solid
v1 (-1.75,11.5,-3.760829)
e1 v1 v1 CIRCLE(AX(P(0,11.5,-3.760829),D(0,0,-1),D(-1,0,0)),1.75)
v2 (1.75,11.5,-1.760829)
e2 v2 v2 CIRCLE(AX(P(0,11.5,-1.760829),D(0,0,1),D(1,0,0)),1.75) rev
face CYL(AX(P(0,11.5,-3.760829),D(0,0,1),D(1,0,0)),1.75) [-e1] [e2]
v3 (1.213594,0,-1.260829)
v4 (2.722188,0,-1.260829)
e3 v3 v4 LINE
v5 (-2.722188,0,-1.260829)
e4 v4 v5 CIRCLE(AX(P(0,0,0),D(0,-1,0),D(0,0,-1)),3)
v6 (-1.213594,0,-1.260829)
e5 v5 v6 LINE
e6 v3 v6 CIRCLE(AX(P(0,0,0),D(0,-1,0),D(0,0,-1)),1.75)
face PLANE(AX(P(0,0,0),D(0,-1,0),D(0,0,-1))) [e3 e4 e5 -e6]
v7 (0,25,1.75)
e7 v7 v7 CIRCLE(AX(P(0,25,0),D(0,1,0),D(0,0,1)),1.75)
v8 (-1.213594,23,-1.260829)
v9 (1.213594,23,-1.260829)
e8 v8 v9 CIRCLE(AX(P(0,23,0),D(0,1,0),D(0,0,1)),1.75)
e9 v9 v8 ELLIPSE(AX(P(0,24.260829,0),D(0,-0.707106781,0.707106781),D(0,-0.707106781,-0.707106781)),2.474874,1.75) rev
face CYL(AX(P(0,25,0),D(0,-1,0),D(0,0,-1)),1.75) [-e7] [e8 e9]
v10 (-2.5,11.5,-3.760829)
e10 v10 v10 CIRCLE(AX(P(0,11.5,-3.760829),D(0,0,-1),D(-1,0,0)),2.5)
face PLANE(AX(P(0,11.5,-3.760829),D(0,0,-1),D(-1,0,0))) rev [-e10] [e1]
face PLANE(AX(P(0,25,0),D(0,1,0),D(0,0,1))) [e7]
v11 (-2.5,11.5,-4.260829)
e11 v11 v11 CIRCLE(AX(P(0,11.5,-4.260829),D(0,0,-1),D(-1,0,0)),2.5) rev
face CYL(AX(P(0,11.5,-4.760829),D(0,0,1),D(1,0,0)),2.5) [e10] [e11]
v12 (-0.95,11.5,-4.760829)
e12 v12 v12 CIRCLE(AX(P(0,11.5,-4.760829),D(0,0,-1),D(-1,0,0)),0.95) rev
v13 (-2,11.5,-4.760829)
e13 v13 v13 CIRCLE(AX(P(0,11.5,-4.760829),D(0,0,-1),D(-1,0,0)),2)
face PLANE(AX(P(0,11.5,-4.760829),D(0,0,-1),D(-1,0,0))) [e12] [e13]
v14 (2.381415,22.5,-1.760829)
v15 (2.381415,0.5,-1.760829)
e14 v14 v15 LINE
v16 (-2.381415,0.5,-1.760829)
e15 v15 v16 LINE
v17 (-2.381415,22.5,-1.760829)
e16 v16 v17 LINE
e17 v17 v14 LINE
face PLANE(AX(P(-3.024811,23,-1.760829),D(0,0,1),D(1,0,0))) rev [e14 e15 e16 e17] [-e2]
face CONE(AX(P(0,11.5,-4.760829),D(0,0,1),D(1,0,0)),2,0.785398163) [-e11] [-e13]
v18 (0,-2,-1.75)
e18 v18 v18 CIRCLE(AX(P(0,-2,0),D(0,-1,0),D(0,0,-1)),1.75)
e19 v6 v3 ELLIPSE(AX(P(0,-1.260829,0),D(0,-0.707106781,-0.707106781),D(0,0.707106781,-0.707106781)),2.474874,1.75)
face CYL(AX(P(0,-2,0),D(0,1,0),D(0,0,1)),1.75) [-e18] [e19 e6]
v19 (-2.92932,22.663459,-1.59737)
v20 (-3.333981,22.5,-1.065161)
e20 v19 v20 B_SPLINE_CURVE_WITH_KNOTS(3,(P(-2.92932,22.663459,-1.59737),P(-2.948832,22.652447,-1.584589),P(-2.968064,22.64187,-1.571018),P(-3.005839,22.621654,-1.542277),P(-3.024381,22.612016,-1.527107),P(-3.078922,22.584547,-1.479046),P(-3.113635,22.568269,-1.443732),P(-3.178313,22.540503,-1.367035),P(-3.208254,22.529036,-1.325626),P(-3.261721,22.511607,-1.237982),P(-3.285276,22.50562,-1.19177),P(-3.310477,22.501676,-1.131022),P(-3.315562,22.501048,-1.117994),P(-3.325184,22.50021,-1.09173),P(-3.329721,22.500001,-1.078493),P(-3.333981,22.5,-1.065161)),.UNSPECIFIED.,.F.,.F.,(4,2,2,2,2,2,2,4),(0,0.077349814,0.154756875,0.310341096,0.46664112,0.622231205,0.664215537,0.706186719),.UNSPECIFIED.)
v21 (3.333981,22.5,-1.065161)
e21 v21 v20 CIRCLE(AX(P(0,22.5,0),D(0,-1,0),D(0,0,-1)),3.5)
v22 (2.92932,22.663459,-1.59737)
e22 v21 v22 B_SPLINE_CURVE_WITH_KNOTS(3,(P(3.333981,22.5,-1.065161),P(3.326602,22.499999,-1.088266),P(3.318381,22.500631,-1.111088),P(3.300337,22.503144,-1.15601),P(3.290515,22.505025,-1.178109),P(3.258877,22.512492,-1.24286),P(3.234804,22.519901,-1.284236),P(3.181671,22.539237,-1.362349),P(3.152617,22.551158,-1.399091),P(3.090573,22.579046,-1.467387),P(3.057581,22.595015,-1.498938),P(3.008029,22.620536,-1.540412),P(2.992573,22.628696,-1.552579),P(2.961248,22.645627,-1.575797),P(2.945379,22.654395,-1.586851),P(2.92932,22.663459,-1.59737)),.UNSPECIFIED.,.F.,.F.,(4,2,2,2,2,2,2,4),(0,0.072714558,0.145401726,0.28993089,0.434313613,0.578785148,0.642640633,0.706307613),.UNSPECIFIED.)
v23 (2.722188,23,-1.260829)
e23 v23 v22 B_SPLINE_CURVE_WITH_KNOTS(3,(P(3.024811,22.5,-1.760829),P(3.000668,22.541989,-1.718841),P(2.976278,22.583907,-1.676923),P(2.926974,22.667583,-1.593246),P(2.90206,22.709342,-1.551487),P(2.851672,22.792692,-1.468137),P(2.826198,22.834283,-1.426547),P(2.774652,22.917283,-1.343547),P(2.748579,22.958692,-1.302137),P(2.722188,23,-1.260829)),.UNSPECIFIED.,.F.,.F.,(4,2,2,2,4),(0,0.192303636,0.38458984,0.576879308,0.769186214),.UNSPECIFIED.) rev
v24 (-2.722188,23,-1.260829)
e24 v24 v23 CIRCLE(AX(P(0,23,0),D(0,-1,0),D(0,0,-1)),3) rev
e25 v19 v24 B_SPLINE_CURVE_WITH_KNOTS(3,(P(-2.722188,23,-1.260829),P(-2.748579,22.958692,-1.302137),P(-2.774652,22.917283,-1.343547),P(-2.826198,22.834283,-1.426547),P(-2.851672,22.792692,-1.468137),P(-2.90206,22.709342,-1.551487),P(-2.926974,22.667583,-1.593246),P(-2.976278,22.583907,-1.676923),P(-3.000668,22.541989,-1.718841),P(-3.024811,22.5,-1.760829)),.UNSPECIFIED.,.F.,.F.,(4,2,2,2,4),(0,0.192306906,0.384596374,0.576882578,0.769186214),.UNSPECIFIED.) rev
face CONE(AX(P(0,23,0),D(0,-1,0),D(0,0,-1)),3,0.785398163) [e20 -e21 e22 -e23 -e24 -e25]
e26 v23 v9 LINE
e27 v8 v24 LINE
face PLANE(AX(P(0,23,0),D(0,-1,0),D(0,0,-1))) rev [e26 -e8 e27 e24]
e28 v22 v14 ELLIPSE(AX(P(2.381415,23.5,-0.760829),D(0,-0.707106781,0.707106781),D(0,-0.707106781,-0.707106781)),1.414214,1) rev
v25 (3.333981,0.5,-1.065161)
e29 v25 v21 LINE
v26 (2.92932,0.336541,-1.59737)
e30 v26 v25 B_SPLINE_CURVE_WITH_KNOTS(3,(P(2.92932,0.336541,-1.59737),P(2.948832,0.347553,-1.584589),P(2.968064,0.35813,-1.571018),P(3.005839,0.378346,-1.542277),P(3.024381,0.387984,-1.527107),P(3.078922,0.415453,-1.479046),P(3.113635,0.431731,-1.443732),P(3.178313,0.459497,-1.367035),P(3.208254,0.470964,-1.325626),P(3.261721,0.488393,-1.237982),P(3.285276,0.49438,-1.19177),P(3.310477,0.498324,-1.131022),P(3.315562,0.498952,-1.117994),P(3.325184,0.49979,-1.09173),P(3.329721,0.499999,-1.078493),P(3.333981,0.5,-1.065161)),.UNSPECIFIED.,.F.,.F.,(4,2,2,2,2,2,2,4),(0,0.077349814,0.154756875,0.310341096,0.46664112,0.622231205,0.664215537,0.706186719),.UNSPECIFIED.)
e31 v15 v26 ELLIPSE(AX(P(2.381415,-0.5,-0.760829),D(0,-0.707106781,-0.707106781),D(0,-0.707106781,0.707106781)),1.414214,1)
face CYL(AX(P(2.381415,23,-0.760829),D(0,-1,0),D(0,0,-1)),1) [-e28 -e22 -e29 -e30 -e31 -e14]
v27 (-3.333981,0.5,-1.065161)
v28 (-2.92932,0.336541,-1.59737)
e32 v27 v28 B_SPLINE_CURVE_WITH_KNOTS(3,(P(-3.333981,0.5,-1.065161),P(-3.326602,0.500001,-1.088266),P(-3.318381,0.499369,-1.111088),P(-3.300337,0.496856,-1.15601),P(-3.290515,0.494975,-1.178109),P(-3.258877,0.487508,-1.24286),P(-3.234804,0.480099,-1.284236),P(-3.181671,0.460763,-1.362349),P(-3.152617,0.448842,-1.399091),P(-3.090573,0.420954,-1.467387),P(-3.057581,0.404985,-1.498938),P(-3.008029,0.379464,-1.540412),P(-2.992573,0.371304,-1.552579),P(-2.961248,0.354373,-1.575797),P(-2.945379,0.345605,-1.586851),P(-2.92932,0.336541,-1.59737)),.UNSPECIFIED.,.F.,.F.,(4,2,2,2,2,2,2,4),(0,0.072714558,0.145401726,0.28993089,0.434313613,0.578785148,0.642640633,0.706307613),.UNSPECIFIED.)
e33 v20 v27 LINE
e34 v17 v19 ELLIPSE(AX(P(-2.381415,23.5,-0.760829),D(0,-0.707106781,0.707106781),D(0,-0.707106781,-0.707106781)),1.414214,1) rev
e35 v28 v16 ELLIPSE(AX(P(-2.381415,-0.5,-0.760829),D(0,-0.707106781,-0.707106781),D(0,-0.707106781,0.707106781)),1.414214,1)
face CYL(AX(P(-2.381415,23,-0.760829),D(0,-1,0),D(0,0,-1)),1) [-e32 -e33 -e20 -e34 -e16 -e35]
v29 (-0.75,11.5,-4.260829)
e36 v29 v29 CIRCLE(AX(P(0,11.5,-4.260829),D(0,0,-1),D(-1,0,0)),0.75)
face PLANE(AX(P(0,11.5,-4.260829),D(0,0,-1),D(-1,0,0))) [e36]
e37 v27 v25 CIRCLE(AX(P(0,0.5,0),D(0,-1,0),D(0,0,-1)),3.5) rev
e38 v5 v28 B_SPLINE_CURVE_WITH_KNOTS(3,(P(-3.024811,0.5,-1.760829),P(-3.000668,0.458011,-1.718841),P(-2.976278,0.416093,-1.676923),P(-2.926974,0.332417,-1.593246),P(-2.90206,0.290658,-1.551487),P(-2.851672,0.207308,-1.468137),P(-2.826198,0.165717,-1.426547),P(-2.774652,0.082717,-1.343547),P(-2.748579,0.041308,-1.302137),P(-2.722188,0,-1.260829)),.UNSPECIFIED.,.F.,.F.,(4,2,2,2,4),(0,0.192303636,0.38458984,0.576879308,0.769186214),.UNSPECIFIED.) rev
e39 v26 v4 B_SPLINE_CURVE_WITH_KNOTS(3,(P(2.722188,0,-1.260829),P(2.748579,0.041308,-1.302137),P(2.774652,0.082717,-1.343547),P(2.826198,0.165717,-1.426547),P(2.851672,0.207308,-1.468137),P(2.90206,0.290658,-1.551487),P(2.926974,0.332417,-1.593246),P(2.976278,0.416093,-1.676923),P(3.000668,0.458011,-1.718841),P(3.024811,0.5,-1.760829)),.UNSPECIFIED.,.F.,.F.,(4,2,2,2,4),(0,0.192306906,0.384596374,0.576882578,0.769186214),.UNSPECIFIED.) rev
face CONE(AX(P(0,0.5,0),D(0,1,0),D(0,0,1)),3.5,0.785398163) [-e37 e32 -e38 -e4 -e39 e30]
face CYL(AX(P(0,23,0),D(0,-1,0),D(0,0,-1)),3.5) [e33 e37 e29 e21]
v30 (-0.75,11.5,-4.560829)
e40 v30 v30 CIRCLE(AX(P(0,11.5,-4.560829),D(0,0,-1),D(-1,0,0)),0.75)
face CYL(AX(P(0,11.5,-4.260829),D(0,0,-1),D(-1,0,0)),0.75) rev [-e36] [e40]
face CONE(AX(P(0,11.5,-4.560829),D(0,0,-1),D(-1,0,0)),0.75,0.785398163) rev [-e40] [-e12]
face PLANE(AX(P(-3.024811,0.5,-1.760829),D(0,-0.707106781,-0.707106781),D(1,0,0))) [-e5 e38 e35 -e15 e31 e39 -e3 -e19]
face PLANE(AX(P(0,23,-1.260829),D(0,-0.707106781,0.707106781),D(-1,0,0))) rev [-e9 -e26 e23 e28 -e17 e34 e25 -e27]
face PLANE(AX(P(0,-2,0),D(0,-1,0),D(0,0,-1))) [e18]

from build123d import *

# Parameters (mm, degrees)
EXTRUDE_1_DEPTH     = 23
SKETCH_2_R          = 1.75
EXTRUDE_2_DEPTH     = 2
EXTRUDE_START       = 2
SKETCH_3_R          = 1.75
EXTRUDE_3_DEPTH     = 2
SKETCH_4_R          = 1.75
EXTRUDE_4_DEPTH     = 2
SKETCH_5_R          = 2.5
EXTRUDE_5_DEPTH     = 1
CHAMFER_1_SIZE      = 0.5
SKETCH_6_R          = 0.75
CUT_EXTRUDE_1_DEPTH = 0.5
CHAMFER_2_SIZE      = 0.2
CHAMFER_3_SIZE      = 0.5
FILLET_3_R          = 1


with BuildPart() as part:
    # 草图1 → 凸台-拉伸1 (new body)
    with BuildSketch(Plane(origin=(0, 0, 0), x_dir=(1, 0, 0), z_dir=(0, 1, 0))):
        with BuildLine():
            Line((-3.024810761, 1.76082931), (3.024810761, 1.76082931))
            ThreePointArc((3.024810761, 1.76082931), (0, -3.5), (-3.024810761, 1.76082931))
        make_face()
    extrude(amount=EXTRUDE_1_DEPTH)

    # 草图2 → 凸台-拉伸2 (add)
    with BuildSketch(Plane(origin=(0, 23, 0), x_dir=(1, 0, 0), z_dir=(0, 1, 0))):
        with Locations(Location((0, 0, 0), (0, 0, 270))):
            Circle(SKETCH_2_R)
    extrude(amount=EXTRUDE_2_DEPTH)

    # 草图3 → 凸台-拉伸3 (add)
    with BuildSketch(Plane.XZ.offset(EXTRUDE_START)):
        with Locations(Location((0, 0, 0), (0, 0, 90))):
            Circle(SKETCH_3_R)
    extrude(amount=-EXTRUDE_3_DEPTH)

    # 草图4 → 凸台-拉伸4 (add)
    with BuildSketch(Plane(origin=(0, 0, -1.76082931), x_dir=(-1, 0, 0), z_dir=(0, 0, -1))):
        with Locations(Location((0, 11.5, 0), (0, 0, 180))):
            Circle(SKETCH_4_R)
    extrude(amount=EXTRUDE_4_DEPTH)

    # 草图5 → 凸台-拉伸5 (add)
    with BuildSketch(Plane(origin=(0, 0, -3.76082931), x_dir=(-1, 0, 0), z_dir=(0, 0, -1))):
        with Locations((0, 11.5)):
            Circle(SKETCH_5_R)
    extrude(amount=EXTRUDE_5_DEPTH)

    # 倒角1
    chamfer_1_edges = [part.edges().sort_by_distance(p)[0] for p in [
        (2.5, 11.5, -4.76082931),
    ]]
    chamfer(chamfer_1_edges, length=CHAMFER_1_SIZE)

    # 草图6 → 切除-拉伸1 (cut)
    with BuildSketch(Plane(origin=(0, 0, -4.76082931), x_dir=(-1, 0, 0), z_dir=(0, 0, -1))):
        with Locations((0, 11.5)):
            Circle(SKETCH_6_R)
    extrude(amount=-CUT_EXTRUDE_1_DEPTH, mode=Mode.SUBTRACT)

    # 倒角2
    chamfer_2_edges = [part.edges().sort_by_distance(p)[0] for p in [
        (0.75, 11.5, -4.76082931),
    ]]
    chamfer(chamfer_2_edges, length=CHAMFER_2_SIZE)

    # 倒角3
    # the kernel refuses this chamfer: 0.5 mm, written as the material it takes off along each edge
    with BuildSketch(Plane(origin=(-4.310652255, 0, -1.76082931), x_dir=(0, 0.9996219169112968, -0.027495876610586494), z_dir=(1, 0, 0))) as chamfer_3_piece_1_section:
        Polygon((CHAMFER_3_SIZE * 0.999621916911, CHAMFER_3_SIZE * 0.0274958766106), (-CHAMFER_3_SIZE * 0.0274958766106, CHAMFER_3_SIZE * 0.999621916911), (0, 0), align=None)
    chamfer_3_piece_1 = extrude(amount=8.62130451, mode=Mode.PRIVATE)
    chamfer_3_piece_1 = chamfer_3_piece_1 - Plane(origin=(0, 0.410648891, 0), x_dir=(0, 0, 1), z_dir=(0, -1, 0)) * Cylinder(1.75, 20, mode=Mode.PRIVATE)
    add(chamfer_3_piece_1, mode=Mode.SUBTRACT)
    with BuildSketch(Plane(origin=(0, 0, 0), x_dir=(0.625040137107155, 0, -0.7805926127020859), z_dir=(-0.7805926127020859, 0, -0.625040137107155))) as chamfer_3_piece_2:
        Polygon((3.5, -CHAMFER_3_SIZE), (3.5 - CHAMFER_3_SIZE, 0), (3.5, 0), align=None)
    revolve(axis=Axis((0, 0, 0), (0, -1, 0)), revolution_arc=282.629733058, mode=Mode.SUBTRACT)
    with BuildSketch(Plane(origin=(0, 23, 0), x_dir=(0.6250401371071543, 0, -0.7805926127020866), z_dir=(-0.7805926127020866, 0, -0.6250401371071543))) as chamfer_3_piece_3:
        Polygon((3.5, CHAMFER_3_SIZE), (3.5 - CHAMFER_3_SIZE, 0), (3.5, 0), align=None)
    revolve(axis=Axis((0, 23, 0), (0, -1, 0)), revolution_arc=282.629733058, mode=Mode.SUBTRACT)
    with BuildSketch(Plane(origin=(-4.310652255, 23, -1.76082931), x_dir=(0, -0.9996219169112968, -0.027495876610586414), z_dir=(1, 0, 0))) as chamfer_3_piece_4_section:
        Polygon((CHAMFER_3_SIZE * 0.999621916911, -CHAMFER_3_SIZE * 0.0274958766106), (-CHAMFER_3_SIZE * 0.0274958766106, -CHAMFER_3_SIZE * 0.999621916911), (0, 0), align=None)
    chamfer_3_piece_4 = extrude(amount=8.62130451, mode=Mode.PRIVATE)
    chamfer_3_piece_4 = chamfer_3_piece_4 - Plane(origin=(0, 22.589351109, 0), x_dir=(0, 0, 1), z_dir=(0, -1, 0)) * Cylinder(1.75, 20, mode=Mode.PRIVATE)
    add(chamfer_3_piece_4, mode=Mode.SUBTRACT)

    # 圆角3
    fillet_3_edges = [part.edges().sort_by_distance(p)[0] for p in [
        (3.024810761, 11.5, -1.76082931),
        (-3.024810761, 11.5, -1.76082931),
    ]]
    fillet(fillet_3_edges, radius=FILLET_3_R)


solid = part.part
